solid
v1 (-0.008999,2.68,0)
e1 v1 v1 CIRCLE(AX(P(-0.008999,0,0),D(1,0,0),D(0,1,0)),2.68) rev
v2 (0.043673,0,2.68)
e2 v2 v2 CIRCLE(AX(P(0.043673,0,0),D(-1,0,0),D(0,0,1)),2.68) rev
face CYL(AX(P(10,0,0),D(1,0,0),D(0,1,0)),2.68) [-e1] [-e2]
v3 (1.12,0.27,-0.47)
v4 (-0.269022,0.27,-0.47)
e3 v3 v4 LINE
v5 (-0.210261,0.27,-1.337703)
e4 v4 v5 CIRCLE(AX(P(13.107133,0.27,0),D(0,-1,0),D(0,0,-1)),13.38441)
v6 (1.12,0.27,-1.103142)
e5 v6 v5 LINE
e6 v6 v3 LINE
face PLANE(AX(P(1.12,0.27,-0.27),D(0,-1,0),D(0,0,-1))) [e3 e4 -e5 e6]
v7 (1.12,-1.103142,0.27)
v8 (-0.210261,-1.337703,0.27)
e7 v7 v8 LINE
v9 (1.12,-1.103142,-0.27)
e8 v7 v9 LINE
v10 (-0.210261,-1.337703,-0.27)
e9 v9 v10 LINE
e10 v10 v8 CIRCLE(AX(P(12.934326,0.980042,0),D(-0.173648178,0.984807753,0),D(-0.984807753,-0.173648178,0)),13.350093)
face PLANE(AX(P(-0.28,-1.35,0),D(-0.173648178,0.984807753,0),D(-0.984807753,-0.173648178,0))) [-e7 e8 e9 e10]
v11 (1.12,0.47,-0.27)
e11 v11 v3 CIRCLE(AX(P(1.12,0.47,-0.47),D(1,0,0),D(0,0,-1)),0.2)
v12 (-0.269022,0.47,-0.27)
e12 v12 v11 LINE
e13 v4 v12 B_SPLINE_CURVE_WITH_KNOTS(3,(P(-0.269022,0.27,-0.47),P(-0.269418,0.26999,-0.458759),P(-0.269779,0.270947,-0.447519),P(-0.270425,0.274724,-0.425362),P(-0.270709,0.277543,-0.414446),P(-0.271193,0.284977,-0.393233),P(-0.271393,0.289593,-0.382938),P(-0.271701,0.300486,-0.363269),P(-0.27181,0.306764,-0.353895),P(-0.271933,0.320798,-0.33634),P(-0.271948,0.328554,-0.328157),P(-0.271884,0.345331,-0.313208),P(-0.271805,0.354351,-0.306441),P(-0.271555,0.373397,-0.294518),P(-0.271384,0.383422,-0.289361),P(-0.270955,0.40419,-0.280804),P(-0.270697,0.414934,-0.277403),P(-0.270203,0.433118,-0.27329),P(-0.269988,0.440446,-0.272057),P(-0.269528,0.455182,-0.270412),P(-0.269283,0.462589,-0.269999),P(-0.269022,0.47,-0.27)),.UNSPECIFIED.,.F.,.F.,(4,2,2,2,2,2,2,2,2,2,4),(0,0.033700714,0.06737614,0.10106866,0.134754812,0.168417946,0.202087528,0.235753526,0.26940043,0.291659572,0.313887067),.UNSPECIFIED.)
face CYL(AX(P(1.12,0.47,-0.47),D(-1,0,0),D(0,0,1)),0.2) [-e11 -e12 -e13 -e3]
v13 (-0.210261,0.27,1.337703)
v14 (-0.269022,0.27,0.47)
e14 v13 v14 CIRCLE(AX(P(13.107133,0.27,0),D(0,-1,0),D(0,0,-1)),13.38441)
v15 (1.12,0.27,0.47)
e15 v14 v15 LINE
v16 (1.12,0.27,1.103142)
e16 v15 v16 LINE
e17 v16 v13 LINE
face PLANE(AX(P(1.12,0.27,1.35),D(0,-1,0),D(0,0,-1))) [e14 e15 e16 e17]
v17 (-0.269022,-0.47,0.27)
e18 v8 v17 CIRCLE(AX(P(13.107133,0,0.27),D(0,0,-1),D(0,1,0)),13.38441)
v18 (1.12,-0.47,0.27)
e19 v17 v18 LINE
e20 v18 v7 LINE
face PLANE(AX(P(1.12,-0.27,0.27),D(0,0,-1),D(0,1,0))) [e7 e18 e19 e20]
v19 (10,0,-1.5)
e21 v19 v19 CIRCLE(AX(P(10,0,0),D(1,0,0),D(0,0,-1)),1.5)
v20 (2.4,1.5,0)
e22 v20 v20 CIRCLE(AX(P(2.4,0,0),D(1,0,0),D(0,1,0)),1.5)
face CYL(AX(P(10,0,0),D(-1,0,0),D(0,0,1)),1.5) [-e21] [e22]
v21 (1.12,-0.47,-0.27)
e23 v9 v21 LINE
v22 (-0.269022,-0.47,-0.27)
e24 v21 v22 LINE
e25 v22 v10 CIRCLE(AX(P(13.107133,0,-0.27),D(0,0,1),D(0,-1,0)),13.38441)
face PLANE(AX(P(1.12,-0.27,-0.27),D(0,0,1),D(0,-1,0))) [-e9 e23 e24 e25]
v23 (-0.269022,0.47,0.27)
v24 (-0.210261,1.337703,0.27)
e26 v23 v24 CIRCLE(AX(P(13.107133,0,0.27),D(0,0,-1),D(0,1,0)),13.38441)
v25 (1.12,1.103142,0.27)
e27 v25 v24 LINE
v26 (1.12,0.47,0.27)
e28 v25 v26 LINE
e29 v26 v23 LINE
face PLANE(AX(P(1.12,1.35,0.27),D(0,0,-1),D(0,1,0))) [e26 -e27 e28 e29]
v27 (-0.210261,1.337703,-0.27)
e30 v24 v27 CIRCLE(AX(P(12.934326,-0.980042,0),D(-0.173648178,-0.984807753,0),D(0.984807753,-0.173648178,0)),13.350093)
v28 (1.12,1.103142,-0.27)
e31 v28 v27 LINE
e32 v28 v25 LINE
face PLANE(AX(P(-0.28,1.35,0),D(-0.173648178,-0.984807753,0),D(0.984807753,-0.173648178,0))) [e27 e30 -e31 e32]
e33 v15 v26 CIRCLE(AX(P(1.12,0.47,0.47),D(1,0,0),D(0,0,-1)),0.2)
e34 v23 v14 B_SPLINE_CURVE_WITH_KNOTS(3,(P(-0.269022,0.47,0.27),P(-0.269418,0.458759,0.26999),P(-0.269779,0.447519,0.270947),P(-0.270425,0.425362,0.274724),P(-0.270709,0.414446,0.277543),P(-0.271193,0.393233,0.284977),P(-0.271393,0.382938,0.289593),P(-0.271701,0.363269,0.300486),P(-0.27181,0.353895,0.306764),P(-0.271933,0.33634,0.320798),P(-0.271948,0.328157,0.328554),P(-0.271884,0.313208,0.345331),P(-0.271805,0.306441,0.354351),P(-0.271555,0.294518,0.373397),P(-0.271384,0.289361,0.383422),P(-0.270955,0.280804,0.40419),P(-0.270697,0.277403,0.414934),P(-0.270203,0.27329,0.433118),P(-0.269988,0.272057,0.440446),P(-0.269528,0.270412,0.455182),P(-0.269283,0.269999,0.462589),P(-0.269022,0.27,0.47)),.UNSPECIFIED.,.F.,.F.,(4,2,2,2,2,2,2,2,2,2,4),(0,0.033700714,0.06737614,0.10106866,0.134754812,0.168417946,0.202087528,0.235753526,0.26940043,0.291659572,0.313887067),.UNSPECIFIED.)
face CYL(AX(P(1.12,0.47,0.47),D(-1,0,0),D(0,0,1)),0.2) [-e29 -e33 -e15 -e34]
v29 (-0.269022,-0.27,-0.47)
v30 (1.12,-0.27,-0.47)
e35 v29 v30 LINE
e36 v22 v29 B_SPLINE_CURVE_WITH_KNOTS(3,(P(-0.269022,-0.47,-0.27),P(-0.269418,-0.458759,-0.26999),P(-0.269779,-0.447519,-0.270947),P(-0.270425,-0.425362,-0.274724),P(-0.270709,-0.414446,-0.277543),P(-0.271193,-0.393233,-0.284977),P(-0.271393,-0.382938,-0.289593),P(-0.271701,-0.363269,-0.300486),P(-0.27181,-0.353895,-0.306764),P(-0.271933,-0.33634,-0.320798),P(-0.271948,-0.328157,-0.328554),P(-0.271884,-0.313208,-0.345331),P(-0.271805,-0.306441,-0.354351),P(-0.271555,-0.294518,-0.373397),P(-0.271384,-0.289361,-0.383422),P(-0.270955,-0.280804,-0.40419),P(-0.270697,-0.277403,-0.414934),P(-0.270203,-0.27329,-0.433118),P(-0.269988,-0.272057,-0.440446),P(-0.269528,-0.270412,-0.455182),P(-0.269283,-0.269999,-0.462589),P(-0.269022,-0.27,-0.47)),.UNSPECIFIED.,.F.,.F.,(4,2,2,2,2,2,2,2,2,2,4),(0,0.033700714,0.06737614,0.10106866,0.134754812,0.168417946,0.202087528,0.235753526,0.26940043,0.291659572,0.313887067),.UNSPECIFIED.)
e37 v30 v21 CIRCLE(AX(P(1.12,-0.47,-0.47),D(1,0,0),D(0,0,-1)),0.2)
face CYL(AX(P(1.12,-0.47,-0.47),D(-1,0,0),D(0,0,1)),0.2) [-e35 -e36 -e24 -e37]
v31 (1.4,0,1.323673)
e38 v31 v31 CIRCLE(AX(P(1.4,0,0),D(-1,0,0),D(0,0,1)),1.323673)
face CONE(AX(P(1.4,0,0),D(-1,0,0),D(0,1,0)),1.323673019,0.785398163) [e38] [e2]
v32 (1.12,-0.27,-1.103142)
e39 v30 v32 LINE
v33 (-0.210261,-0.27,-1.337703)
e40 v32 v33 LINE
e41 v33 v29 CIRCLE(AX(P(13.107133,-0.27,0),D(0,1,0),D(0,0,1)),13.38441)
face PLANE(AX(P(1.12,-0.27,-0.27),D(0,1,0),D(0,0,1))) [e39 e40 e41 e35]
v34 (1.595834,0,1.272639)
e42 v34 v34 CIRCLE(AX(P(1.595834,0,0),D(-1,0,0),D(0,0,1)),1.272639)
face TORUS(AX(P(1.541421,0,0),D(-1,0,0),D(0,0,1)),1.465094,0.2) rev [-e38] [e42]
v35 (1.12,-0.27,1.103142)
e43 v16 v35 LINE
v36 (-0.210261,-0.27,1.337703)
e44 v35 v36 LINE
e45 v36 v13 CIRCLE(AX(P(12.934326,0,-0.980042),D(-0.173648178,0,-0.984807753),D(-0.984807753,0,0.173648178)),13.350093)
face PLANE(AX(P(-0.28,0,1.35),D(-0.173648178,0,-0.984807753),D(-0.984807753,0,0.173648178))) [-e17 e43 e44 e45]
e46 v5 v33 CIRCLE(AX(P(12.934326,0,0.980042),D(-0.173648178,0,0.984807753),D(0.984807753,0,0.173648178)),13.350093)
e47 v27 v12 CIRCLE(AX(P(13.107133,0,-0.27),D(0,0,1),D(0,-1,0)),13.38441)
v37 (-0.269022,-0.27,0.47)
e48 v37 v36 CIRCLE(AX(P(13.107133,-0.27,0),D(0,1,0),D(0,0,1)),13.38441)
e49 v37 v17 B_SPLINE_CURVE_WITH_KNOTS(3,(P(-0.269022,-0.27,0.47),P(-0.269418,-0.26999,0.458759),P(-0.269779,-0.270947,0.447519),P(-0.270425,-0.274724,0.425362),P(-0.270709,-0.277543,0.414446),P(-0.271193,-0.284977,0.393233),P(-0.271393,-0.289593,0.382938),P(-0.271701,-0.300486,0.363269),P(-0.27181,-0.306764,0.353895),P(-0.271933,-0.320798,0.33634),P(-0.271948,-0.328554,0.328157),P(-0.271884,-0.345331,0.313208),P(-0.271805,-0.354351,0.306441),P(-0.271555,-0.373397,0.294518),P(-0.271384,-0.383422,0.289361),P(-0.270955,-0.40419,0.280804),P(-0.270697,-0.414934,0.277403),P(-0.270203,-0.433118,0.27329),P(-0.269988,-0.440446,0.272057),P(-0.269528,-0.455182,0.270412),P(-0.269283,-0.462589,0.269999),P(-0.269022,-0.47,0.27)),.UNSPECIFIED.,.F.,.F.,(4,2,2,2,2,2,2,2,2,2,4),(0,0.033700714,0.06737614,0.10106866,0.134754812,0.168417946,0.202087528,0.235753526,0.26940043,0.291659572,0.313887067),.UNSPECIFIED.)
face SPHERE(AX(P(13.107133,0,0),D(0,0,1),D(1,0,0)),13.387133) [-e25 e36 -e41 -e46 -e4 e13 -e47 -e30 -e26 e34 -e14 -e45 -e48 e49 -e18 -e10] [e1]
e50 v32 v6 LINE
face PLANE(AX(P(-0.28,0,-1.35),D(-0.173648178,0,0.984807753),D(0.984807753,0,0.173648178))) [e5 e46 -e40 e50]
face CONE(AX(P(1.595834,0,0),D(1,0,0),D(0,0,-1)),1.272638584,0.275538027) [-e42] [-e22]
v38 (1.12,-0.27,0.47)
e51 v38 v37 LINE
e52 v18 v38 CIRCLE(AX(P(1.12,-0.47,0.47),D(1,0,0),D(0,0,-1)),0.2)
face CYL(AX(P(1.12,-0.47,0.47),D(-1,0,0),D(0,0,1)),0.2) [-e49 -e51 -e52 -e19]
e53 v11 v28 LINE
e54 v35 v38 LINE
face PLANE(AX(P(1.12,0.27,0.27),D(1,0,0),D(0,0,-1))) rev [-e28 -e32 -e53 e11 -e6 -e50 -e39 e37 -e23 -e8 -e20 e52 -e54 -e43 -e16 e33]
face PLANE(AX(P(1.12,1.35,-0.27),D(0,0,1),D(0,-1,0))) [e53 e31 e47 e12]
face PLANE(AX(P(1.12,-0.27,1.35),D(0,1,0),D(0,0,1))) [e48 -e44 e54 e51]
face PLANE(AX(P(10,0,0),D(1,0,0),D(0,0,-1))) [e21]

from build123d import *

# Parameters (mm, degrees)
SKETCH1_R           = 1.5
BASEBODY_DEPTH      = 10
BASETOP_FACE_RADIUS = 2.723673019
BASETOP_HEIGHT      = 0.28
SKETCH5_W           = 4
SKETCH5_H           = 2
CROSSRECESS_DEPTH   = 1.4
FILLET1_R           = 0.2
DRAFT3_ANGLE        = -10


# Read off the part's stored shape, not the designer's step: Neck, BaseHead
with BuildPart() as part:
    # Sketch1 → BaseBody (new body)
    with BuildSketch(Plane(origin=(0, 0, 0), x_dir=(0, 0, -1), z_dir=(1, 0, 0))):
        Circle(SKETCH1_R)
    extrude(amount=BASEBODY_DEPTH)

    # Neck outline → Neck (revolve, cut)
    with BuildSketch(Plane.YX):
        Polygon((1.5, 2.4), (1.076815246, 0), (1.5, 0), align=None)
    revolve(axis=Axis((0, 0, 0), (1, 0, 0)), mode=Mode.SUBTRACT)

    # BaseHead outline → BaseHead (revolve)
    with BuildSketch(Plane.YX):
        Polygon((0, 0), (2.723673019, 0), (1.323673019, 1.4), (0, 1.4), align=None)
    revolve(axis=Axis((0, 0, 0), (1, 0, 0)))

    # BaseTop: a dome of height H over a round flat face of radius A is a cap of a sphere of radius (A * A + H * H) / (2 * H)
    basetop_r = (BASETOP_FACE_RADIUS * BASETOP_FACE_RADIUS + BASETOP_HEIGHT * BASETOP_HEIGHT) / (2 * BASETOP_HEIGHT)
    basetop_base = Plane((0, 0, 0), z_dir=(-1, 0, 0))
    with Locations(basetop_base.offset(BASETOP_HEIGHT - basetop_r)):
        basetop_ball = Sphere(basetop_r, mode=Mode.PRIVATE)
    add(split(basetop_ball, bisect_by=basetop_base, keep=Keep.TOP, mode=Mode.PRIVATE))

    # Sketch5 → Cut-Revolve1 (revolve, cut)
    with BuildSketch(Plane.XY):
        with Locations((0, 3.68)):
            Rectangle(SKETCH5_W, SKETCH5_H)
    revolve(axis=Axis((10, 0, 0), (-1, 0, 0)), mode=Mode.SUBTRACT)

    # Sketch7 → CrossRecess (cut)
    with BuildSketch(Plane(origin=(-0.28, 0, 0), x_dir=(0, 0, -1), z_dir=(1, 0, 0))):
        Polygon((0.27, -0.27), (0.27, -1.35), (-0.27, -1.35), (-0.27, -0.27), (-1.35, -0.27), (-1.35, 0.27), (-0.27, 0.27), (-0.27, 1.35), (0.27, 1.35), (0.27, 0.27), (1.35, 0.27), (1.35, -0.27), align=None)
    extrude(amount=CROSSRECESS_DEPTH, mode=Mode.SUBTRACT)

    # Fillet1
    fillet1_edges = [part.edges().sort_by_distance(p)[0] for p in [
        (0.422723318, 0.27, 0.27),
        (0.422723318, -0.27, 0.27),
        (0.422723318, -0.27, -0.27),
        (0.422723318, 0.27, -0.27),
    ]]
    fillet(fillet1_edges, radius=FILLET1_R)

    # Draft3
    draft3_faces = [part.faces().sort_by_distance(p)[0] for p in [
        (0.454577412, -1.35, 0),
        (0.454577412, 0, 1.35),
        (0.454577412, 0, -1.35),
        (0.454577412, 1.35, 0),
    ]]
    draft(draft3_faces, Plane(origin=(-0.28, 0, 0), x_dir=(0, 0, 1), z_dir=(1, 0, 0)), DRAFT3_ANGLE)

    # Sketch8 → Cut-Revolve2 (revolve, cut)
    with BuildSketch(Plane.XY, mode=Mode.PRIVATE) as cut_revolve2_sk:
        with BuildLine():
            Line((1.4, 1.323673019), (0.043673019, 2.68))
            Line((0.043673019, 2.68), (2.4, 2.68))
            Line((2.4, 2.68), (2.4, 1.5))
            Line((2.4, 1.5), (1.595834298, 1.272638584))
            ThreePointArc((1.595834298, 1.272638584), (1.490985809, 1.271558189), (1.4, 1.323673019))
        make_face()
    revolve(cut_revolve2_sk.sketch.rotate(Axis((0, 0, 0), (1, 0, 0)), 90), axis=Axis((0, 0, 0), (1, 0, 0)), mode=Mode.SUBTRACT)


solid = part.part
